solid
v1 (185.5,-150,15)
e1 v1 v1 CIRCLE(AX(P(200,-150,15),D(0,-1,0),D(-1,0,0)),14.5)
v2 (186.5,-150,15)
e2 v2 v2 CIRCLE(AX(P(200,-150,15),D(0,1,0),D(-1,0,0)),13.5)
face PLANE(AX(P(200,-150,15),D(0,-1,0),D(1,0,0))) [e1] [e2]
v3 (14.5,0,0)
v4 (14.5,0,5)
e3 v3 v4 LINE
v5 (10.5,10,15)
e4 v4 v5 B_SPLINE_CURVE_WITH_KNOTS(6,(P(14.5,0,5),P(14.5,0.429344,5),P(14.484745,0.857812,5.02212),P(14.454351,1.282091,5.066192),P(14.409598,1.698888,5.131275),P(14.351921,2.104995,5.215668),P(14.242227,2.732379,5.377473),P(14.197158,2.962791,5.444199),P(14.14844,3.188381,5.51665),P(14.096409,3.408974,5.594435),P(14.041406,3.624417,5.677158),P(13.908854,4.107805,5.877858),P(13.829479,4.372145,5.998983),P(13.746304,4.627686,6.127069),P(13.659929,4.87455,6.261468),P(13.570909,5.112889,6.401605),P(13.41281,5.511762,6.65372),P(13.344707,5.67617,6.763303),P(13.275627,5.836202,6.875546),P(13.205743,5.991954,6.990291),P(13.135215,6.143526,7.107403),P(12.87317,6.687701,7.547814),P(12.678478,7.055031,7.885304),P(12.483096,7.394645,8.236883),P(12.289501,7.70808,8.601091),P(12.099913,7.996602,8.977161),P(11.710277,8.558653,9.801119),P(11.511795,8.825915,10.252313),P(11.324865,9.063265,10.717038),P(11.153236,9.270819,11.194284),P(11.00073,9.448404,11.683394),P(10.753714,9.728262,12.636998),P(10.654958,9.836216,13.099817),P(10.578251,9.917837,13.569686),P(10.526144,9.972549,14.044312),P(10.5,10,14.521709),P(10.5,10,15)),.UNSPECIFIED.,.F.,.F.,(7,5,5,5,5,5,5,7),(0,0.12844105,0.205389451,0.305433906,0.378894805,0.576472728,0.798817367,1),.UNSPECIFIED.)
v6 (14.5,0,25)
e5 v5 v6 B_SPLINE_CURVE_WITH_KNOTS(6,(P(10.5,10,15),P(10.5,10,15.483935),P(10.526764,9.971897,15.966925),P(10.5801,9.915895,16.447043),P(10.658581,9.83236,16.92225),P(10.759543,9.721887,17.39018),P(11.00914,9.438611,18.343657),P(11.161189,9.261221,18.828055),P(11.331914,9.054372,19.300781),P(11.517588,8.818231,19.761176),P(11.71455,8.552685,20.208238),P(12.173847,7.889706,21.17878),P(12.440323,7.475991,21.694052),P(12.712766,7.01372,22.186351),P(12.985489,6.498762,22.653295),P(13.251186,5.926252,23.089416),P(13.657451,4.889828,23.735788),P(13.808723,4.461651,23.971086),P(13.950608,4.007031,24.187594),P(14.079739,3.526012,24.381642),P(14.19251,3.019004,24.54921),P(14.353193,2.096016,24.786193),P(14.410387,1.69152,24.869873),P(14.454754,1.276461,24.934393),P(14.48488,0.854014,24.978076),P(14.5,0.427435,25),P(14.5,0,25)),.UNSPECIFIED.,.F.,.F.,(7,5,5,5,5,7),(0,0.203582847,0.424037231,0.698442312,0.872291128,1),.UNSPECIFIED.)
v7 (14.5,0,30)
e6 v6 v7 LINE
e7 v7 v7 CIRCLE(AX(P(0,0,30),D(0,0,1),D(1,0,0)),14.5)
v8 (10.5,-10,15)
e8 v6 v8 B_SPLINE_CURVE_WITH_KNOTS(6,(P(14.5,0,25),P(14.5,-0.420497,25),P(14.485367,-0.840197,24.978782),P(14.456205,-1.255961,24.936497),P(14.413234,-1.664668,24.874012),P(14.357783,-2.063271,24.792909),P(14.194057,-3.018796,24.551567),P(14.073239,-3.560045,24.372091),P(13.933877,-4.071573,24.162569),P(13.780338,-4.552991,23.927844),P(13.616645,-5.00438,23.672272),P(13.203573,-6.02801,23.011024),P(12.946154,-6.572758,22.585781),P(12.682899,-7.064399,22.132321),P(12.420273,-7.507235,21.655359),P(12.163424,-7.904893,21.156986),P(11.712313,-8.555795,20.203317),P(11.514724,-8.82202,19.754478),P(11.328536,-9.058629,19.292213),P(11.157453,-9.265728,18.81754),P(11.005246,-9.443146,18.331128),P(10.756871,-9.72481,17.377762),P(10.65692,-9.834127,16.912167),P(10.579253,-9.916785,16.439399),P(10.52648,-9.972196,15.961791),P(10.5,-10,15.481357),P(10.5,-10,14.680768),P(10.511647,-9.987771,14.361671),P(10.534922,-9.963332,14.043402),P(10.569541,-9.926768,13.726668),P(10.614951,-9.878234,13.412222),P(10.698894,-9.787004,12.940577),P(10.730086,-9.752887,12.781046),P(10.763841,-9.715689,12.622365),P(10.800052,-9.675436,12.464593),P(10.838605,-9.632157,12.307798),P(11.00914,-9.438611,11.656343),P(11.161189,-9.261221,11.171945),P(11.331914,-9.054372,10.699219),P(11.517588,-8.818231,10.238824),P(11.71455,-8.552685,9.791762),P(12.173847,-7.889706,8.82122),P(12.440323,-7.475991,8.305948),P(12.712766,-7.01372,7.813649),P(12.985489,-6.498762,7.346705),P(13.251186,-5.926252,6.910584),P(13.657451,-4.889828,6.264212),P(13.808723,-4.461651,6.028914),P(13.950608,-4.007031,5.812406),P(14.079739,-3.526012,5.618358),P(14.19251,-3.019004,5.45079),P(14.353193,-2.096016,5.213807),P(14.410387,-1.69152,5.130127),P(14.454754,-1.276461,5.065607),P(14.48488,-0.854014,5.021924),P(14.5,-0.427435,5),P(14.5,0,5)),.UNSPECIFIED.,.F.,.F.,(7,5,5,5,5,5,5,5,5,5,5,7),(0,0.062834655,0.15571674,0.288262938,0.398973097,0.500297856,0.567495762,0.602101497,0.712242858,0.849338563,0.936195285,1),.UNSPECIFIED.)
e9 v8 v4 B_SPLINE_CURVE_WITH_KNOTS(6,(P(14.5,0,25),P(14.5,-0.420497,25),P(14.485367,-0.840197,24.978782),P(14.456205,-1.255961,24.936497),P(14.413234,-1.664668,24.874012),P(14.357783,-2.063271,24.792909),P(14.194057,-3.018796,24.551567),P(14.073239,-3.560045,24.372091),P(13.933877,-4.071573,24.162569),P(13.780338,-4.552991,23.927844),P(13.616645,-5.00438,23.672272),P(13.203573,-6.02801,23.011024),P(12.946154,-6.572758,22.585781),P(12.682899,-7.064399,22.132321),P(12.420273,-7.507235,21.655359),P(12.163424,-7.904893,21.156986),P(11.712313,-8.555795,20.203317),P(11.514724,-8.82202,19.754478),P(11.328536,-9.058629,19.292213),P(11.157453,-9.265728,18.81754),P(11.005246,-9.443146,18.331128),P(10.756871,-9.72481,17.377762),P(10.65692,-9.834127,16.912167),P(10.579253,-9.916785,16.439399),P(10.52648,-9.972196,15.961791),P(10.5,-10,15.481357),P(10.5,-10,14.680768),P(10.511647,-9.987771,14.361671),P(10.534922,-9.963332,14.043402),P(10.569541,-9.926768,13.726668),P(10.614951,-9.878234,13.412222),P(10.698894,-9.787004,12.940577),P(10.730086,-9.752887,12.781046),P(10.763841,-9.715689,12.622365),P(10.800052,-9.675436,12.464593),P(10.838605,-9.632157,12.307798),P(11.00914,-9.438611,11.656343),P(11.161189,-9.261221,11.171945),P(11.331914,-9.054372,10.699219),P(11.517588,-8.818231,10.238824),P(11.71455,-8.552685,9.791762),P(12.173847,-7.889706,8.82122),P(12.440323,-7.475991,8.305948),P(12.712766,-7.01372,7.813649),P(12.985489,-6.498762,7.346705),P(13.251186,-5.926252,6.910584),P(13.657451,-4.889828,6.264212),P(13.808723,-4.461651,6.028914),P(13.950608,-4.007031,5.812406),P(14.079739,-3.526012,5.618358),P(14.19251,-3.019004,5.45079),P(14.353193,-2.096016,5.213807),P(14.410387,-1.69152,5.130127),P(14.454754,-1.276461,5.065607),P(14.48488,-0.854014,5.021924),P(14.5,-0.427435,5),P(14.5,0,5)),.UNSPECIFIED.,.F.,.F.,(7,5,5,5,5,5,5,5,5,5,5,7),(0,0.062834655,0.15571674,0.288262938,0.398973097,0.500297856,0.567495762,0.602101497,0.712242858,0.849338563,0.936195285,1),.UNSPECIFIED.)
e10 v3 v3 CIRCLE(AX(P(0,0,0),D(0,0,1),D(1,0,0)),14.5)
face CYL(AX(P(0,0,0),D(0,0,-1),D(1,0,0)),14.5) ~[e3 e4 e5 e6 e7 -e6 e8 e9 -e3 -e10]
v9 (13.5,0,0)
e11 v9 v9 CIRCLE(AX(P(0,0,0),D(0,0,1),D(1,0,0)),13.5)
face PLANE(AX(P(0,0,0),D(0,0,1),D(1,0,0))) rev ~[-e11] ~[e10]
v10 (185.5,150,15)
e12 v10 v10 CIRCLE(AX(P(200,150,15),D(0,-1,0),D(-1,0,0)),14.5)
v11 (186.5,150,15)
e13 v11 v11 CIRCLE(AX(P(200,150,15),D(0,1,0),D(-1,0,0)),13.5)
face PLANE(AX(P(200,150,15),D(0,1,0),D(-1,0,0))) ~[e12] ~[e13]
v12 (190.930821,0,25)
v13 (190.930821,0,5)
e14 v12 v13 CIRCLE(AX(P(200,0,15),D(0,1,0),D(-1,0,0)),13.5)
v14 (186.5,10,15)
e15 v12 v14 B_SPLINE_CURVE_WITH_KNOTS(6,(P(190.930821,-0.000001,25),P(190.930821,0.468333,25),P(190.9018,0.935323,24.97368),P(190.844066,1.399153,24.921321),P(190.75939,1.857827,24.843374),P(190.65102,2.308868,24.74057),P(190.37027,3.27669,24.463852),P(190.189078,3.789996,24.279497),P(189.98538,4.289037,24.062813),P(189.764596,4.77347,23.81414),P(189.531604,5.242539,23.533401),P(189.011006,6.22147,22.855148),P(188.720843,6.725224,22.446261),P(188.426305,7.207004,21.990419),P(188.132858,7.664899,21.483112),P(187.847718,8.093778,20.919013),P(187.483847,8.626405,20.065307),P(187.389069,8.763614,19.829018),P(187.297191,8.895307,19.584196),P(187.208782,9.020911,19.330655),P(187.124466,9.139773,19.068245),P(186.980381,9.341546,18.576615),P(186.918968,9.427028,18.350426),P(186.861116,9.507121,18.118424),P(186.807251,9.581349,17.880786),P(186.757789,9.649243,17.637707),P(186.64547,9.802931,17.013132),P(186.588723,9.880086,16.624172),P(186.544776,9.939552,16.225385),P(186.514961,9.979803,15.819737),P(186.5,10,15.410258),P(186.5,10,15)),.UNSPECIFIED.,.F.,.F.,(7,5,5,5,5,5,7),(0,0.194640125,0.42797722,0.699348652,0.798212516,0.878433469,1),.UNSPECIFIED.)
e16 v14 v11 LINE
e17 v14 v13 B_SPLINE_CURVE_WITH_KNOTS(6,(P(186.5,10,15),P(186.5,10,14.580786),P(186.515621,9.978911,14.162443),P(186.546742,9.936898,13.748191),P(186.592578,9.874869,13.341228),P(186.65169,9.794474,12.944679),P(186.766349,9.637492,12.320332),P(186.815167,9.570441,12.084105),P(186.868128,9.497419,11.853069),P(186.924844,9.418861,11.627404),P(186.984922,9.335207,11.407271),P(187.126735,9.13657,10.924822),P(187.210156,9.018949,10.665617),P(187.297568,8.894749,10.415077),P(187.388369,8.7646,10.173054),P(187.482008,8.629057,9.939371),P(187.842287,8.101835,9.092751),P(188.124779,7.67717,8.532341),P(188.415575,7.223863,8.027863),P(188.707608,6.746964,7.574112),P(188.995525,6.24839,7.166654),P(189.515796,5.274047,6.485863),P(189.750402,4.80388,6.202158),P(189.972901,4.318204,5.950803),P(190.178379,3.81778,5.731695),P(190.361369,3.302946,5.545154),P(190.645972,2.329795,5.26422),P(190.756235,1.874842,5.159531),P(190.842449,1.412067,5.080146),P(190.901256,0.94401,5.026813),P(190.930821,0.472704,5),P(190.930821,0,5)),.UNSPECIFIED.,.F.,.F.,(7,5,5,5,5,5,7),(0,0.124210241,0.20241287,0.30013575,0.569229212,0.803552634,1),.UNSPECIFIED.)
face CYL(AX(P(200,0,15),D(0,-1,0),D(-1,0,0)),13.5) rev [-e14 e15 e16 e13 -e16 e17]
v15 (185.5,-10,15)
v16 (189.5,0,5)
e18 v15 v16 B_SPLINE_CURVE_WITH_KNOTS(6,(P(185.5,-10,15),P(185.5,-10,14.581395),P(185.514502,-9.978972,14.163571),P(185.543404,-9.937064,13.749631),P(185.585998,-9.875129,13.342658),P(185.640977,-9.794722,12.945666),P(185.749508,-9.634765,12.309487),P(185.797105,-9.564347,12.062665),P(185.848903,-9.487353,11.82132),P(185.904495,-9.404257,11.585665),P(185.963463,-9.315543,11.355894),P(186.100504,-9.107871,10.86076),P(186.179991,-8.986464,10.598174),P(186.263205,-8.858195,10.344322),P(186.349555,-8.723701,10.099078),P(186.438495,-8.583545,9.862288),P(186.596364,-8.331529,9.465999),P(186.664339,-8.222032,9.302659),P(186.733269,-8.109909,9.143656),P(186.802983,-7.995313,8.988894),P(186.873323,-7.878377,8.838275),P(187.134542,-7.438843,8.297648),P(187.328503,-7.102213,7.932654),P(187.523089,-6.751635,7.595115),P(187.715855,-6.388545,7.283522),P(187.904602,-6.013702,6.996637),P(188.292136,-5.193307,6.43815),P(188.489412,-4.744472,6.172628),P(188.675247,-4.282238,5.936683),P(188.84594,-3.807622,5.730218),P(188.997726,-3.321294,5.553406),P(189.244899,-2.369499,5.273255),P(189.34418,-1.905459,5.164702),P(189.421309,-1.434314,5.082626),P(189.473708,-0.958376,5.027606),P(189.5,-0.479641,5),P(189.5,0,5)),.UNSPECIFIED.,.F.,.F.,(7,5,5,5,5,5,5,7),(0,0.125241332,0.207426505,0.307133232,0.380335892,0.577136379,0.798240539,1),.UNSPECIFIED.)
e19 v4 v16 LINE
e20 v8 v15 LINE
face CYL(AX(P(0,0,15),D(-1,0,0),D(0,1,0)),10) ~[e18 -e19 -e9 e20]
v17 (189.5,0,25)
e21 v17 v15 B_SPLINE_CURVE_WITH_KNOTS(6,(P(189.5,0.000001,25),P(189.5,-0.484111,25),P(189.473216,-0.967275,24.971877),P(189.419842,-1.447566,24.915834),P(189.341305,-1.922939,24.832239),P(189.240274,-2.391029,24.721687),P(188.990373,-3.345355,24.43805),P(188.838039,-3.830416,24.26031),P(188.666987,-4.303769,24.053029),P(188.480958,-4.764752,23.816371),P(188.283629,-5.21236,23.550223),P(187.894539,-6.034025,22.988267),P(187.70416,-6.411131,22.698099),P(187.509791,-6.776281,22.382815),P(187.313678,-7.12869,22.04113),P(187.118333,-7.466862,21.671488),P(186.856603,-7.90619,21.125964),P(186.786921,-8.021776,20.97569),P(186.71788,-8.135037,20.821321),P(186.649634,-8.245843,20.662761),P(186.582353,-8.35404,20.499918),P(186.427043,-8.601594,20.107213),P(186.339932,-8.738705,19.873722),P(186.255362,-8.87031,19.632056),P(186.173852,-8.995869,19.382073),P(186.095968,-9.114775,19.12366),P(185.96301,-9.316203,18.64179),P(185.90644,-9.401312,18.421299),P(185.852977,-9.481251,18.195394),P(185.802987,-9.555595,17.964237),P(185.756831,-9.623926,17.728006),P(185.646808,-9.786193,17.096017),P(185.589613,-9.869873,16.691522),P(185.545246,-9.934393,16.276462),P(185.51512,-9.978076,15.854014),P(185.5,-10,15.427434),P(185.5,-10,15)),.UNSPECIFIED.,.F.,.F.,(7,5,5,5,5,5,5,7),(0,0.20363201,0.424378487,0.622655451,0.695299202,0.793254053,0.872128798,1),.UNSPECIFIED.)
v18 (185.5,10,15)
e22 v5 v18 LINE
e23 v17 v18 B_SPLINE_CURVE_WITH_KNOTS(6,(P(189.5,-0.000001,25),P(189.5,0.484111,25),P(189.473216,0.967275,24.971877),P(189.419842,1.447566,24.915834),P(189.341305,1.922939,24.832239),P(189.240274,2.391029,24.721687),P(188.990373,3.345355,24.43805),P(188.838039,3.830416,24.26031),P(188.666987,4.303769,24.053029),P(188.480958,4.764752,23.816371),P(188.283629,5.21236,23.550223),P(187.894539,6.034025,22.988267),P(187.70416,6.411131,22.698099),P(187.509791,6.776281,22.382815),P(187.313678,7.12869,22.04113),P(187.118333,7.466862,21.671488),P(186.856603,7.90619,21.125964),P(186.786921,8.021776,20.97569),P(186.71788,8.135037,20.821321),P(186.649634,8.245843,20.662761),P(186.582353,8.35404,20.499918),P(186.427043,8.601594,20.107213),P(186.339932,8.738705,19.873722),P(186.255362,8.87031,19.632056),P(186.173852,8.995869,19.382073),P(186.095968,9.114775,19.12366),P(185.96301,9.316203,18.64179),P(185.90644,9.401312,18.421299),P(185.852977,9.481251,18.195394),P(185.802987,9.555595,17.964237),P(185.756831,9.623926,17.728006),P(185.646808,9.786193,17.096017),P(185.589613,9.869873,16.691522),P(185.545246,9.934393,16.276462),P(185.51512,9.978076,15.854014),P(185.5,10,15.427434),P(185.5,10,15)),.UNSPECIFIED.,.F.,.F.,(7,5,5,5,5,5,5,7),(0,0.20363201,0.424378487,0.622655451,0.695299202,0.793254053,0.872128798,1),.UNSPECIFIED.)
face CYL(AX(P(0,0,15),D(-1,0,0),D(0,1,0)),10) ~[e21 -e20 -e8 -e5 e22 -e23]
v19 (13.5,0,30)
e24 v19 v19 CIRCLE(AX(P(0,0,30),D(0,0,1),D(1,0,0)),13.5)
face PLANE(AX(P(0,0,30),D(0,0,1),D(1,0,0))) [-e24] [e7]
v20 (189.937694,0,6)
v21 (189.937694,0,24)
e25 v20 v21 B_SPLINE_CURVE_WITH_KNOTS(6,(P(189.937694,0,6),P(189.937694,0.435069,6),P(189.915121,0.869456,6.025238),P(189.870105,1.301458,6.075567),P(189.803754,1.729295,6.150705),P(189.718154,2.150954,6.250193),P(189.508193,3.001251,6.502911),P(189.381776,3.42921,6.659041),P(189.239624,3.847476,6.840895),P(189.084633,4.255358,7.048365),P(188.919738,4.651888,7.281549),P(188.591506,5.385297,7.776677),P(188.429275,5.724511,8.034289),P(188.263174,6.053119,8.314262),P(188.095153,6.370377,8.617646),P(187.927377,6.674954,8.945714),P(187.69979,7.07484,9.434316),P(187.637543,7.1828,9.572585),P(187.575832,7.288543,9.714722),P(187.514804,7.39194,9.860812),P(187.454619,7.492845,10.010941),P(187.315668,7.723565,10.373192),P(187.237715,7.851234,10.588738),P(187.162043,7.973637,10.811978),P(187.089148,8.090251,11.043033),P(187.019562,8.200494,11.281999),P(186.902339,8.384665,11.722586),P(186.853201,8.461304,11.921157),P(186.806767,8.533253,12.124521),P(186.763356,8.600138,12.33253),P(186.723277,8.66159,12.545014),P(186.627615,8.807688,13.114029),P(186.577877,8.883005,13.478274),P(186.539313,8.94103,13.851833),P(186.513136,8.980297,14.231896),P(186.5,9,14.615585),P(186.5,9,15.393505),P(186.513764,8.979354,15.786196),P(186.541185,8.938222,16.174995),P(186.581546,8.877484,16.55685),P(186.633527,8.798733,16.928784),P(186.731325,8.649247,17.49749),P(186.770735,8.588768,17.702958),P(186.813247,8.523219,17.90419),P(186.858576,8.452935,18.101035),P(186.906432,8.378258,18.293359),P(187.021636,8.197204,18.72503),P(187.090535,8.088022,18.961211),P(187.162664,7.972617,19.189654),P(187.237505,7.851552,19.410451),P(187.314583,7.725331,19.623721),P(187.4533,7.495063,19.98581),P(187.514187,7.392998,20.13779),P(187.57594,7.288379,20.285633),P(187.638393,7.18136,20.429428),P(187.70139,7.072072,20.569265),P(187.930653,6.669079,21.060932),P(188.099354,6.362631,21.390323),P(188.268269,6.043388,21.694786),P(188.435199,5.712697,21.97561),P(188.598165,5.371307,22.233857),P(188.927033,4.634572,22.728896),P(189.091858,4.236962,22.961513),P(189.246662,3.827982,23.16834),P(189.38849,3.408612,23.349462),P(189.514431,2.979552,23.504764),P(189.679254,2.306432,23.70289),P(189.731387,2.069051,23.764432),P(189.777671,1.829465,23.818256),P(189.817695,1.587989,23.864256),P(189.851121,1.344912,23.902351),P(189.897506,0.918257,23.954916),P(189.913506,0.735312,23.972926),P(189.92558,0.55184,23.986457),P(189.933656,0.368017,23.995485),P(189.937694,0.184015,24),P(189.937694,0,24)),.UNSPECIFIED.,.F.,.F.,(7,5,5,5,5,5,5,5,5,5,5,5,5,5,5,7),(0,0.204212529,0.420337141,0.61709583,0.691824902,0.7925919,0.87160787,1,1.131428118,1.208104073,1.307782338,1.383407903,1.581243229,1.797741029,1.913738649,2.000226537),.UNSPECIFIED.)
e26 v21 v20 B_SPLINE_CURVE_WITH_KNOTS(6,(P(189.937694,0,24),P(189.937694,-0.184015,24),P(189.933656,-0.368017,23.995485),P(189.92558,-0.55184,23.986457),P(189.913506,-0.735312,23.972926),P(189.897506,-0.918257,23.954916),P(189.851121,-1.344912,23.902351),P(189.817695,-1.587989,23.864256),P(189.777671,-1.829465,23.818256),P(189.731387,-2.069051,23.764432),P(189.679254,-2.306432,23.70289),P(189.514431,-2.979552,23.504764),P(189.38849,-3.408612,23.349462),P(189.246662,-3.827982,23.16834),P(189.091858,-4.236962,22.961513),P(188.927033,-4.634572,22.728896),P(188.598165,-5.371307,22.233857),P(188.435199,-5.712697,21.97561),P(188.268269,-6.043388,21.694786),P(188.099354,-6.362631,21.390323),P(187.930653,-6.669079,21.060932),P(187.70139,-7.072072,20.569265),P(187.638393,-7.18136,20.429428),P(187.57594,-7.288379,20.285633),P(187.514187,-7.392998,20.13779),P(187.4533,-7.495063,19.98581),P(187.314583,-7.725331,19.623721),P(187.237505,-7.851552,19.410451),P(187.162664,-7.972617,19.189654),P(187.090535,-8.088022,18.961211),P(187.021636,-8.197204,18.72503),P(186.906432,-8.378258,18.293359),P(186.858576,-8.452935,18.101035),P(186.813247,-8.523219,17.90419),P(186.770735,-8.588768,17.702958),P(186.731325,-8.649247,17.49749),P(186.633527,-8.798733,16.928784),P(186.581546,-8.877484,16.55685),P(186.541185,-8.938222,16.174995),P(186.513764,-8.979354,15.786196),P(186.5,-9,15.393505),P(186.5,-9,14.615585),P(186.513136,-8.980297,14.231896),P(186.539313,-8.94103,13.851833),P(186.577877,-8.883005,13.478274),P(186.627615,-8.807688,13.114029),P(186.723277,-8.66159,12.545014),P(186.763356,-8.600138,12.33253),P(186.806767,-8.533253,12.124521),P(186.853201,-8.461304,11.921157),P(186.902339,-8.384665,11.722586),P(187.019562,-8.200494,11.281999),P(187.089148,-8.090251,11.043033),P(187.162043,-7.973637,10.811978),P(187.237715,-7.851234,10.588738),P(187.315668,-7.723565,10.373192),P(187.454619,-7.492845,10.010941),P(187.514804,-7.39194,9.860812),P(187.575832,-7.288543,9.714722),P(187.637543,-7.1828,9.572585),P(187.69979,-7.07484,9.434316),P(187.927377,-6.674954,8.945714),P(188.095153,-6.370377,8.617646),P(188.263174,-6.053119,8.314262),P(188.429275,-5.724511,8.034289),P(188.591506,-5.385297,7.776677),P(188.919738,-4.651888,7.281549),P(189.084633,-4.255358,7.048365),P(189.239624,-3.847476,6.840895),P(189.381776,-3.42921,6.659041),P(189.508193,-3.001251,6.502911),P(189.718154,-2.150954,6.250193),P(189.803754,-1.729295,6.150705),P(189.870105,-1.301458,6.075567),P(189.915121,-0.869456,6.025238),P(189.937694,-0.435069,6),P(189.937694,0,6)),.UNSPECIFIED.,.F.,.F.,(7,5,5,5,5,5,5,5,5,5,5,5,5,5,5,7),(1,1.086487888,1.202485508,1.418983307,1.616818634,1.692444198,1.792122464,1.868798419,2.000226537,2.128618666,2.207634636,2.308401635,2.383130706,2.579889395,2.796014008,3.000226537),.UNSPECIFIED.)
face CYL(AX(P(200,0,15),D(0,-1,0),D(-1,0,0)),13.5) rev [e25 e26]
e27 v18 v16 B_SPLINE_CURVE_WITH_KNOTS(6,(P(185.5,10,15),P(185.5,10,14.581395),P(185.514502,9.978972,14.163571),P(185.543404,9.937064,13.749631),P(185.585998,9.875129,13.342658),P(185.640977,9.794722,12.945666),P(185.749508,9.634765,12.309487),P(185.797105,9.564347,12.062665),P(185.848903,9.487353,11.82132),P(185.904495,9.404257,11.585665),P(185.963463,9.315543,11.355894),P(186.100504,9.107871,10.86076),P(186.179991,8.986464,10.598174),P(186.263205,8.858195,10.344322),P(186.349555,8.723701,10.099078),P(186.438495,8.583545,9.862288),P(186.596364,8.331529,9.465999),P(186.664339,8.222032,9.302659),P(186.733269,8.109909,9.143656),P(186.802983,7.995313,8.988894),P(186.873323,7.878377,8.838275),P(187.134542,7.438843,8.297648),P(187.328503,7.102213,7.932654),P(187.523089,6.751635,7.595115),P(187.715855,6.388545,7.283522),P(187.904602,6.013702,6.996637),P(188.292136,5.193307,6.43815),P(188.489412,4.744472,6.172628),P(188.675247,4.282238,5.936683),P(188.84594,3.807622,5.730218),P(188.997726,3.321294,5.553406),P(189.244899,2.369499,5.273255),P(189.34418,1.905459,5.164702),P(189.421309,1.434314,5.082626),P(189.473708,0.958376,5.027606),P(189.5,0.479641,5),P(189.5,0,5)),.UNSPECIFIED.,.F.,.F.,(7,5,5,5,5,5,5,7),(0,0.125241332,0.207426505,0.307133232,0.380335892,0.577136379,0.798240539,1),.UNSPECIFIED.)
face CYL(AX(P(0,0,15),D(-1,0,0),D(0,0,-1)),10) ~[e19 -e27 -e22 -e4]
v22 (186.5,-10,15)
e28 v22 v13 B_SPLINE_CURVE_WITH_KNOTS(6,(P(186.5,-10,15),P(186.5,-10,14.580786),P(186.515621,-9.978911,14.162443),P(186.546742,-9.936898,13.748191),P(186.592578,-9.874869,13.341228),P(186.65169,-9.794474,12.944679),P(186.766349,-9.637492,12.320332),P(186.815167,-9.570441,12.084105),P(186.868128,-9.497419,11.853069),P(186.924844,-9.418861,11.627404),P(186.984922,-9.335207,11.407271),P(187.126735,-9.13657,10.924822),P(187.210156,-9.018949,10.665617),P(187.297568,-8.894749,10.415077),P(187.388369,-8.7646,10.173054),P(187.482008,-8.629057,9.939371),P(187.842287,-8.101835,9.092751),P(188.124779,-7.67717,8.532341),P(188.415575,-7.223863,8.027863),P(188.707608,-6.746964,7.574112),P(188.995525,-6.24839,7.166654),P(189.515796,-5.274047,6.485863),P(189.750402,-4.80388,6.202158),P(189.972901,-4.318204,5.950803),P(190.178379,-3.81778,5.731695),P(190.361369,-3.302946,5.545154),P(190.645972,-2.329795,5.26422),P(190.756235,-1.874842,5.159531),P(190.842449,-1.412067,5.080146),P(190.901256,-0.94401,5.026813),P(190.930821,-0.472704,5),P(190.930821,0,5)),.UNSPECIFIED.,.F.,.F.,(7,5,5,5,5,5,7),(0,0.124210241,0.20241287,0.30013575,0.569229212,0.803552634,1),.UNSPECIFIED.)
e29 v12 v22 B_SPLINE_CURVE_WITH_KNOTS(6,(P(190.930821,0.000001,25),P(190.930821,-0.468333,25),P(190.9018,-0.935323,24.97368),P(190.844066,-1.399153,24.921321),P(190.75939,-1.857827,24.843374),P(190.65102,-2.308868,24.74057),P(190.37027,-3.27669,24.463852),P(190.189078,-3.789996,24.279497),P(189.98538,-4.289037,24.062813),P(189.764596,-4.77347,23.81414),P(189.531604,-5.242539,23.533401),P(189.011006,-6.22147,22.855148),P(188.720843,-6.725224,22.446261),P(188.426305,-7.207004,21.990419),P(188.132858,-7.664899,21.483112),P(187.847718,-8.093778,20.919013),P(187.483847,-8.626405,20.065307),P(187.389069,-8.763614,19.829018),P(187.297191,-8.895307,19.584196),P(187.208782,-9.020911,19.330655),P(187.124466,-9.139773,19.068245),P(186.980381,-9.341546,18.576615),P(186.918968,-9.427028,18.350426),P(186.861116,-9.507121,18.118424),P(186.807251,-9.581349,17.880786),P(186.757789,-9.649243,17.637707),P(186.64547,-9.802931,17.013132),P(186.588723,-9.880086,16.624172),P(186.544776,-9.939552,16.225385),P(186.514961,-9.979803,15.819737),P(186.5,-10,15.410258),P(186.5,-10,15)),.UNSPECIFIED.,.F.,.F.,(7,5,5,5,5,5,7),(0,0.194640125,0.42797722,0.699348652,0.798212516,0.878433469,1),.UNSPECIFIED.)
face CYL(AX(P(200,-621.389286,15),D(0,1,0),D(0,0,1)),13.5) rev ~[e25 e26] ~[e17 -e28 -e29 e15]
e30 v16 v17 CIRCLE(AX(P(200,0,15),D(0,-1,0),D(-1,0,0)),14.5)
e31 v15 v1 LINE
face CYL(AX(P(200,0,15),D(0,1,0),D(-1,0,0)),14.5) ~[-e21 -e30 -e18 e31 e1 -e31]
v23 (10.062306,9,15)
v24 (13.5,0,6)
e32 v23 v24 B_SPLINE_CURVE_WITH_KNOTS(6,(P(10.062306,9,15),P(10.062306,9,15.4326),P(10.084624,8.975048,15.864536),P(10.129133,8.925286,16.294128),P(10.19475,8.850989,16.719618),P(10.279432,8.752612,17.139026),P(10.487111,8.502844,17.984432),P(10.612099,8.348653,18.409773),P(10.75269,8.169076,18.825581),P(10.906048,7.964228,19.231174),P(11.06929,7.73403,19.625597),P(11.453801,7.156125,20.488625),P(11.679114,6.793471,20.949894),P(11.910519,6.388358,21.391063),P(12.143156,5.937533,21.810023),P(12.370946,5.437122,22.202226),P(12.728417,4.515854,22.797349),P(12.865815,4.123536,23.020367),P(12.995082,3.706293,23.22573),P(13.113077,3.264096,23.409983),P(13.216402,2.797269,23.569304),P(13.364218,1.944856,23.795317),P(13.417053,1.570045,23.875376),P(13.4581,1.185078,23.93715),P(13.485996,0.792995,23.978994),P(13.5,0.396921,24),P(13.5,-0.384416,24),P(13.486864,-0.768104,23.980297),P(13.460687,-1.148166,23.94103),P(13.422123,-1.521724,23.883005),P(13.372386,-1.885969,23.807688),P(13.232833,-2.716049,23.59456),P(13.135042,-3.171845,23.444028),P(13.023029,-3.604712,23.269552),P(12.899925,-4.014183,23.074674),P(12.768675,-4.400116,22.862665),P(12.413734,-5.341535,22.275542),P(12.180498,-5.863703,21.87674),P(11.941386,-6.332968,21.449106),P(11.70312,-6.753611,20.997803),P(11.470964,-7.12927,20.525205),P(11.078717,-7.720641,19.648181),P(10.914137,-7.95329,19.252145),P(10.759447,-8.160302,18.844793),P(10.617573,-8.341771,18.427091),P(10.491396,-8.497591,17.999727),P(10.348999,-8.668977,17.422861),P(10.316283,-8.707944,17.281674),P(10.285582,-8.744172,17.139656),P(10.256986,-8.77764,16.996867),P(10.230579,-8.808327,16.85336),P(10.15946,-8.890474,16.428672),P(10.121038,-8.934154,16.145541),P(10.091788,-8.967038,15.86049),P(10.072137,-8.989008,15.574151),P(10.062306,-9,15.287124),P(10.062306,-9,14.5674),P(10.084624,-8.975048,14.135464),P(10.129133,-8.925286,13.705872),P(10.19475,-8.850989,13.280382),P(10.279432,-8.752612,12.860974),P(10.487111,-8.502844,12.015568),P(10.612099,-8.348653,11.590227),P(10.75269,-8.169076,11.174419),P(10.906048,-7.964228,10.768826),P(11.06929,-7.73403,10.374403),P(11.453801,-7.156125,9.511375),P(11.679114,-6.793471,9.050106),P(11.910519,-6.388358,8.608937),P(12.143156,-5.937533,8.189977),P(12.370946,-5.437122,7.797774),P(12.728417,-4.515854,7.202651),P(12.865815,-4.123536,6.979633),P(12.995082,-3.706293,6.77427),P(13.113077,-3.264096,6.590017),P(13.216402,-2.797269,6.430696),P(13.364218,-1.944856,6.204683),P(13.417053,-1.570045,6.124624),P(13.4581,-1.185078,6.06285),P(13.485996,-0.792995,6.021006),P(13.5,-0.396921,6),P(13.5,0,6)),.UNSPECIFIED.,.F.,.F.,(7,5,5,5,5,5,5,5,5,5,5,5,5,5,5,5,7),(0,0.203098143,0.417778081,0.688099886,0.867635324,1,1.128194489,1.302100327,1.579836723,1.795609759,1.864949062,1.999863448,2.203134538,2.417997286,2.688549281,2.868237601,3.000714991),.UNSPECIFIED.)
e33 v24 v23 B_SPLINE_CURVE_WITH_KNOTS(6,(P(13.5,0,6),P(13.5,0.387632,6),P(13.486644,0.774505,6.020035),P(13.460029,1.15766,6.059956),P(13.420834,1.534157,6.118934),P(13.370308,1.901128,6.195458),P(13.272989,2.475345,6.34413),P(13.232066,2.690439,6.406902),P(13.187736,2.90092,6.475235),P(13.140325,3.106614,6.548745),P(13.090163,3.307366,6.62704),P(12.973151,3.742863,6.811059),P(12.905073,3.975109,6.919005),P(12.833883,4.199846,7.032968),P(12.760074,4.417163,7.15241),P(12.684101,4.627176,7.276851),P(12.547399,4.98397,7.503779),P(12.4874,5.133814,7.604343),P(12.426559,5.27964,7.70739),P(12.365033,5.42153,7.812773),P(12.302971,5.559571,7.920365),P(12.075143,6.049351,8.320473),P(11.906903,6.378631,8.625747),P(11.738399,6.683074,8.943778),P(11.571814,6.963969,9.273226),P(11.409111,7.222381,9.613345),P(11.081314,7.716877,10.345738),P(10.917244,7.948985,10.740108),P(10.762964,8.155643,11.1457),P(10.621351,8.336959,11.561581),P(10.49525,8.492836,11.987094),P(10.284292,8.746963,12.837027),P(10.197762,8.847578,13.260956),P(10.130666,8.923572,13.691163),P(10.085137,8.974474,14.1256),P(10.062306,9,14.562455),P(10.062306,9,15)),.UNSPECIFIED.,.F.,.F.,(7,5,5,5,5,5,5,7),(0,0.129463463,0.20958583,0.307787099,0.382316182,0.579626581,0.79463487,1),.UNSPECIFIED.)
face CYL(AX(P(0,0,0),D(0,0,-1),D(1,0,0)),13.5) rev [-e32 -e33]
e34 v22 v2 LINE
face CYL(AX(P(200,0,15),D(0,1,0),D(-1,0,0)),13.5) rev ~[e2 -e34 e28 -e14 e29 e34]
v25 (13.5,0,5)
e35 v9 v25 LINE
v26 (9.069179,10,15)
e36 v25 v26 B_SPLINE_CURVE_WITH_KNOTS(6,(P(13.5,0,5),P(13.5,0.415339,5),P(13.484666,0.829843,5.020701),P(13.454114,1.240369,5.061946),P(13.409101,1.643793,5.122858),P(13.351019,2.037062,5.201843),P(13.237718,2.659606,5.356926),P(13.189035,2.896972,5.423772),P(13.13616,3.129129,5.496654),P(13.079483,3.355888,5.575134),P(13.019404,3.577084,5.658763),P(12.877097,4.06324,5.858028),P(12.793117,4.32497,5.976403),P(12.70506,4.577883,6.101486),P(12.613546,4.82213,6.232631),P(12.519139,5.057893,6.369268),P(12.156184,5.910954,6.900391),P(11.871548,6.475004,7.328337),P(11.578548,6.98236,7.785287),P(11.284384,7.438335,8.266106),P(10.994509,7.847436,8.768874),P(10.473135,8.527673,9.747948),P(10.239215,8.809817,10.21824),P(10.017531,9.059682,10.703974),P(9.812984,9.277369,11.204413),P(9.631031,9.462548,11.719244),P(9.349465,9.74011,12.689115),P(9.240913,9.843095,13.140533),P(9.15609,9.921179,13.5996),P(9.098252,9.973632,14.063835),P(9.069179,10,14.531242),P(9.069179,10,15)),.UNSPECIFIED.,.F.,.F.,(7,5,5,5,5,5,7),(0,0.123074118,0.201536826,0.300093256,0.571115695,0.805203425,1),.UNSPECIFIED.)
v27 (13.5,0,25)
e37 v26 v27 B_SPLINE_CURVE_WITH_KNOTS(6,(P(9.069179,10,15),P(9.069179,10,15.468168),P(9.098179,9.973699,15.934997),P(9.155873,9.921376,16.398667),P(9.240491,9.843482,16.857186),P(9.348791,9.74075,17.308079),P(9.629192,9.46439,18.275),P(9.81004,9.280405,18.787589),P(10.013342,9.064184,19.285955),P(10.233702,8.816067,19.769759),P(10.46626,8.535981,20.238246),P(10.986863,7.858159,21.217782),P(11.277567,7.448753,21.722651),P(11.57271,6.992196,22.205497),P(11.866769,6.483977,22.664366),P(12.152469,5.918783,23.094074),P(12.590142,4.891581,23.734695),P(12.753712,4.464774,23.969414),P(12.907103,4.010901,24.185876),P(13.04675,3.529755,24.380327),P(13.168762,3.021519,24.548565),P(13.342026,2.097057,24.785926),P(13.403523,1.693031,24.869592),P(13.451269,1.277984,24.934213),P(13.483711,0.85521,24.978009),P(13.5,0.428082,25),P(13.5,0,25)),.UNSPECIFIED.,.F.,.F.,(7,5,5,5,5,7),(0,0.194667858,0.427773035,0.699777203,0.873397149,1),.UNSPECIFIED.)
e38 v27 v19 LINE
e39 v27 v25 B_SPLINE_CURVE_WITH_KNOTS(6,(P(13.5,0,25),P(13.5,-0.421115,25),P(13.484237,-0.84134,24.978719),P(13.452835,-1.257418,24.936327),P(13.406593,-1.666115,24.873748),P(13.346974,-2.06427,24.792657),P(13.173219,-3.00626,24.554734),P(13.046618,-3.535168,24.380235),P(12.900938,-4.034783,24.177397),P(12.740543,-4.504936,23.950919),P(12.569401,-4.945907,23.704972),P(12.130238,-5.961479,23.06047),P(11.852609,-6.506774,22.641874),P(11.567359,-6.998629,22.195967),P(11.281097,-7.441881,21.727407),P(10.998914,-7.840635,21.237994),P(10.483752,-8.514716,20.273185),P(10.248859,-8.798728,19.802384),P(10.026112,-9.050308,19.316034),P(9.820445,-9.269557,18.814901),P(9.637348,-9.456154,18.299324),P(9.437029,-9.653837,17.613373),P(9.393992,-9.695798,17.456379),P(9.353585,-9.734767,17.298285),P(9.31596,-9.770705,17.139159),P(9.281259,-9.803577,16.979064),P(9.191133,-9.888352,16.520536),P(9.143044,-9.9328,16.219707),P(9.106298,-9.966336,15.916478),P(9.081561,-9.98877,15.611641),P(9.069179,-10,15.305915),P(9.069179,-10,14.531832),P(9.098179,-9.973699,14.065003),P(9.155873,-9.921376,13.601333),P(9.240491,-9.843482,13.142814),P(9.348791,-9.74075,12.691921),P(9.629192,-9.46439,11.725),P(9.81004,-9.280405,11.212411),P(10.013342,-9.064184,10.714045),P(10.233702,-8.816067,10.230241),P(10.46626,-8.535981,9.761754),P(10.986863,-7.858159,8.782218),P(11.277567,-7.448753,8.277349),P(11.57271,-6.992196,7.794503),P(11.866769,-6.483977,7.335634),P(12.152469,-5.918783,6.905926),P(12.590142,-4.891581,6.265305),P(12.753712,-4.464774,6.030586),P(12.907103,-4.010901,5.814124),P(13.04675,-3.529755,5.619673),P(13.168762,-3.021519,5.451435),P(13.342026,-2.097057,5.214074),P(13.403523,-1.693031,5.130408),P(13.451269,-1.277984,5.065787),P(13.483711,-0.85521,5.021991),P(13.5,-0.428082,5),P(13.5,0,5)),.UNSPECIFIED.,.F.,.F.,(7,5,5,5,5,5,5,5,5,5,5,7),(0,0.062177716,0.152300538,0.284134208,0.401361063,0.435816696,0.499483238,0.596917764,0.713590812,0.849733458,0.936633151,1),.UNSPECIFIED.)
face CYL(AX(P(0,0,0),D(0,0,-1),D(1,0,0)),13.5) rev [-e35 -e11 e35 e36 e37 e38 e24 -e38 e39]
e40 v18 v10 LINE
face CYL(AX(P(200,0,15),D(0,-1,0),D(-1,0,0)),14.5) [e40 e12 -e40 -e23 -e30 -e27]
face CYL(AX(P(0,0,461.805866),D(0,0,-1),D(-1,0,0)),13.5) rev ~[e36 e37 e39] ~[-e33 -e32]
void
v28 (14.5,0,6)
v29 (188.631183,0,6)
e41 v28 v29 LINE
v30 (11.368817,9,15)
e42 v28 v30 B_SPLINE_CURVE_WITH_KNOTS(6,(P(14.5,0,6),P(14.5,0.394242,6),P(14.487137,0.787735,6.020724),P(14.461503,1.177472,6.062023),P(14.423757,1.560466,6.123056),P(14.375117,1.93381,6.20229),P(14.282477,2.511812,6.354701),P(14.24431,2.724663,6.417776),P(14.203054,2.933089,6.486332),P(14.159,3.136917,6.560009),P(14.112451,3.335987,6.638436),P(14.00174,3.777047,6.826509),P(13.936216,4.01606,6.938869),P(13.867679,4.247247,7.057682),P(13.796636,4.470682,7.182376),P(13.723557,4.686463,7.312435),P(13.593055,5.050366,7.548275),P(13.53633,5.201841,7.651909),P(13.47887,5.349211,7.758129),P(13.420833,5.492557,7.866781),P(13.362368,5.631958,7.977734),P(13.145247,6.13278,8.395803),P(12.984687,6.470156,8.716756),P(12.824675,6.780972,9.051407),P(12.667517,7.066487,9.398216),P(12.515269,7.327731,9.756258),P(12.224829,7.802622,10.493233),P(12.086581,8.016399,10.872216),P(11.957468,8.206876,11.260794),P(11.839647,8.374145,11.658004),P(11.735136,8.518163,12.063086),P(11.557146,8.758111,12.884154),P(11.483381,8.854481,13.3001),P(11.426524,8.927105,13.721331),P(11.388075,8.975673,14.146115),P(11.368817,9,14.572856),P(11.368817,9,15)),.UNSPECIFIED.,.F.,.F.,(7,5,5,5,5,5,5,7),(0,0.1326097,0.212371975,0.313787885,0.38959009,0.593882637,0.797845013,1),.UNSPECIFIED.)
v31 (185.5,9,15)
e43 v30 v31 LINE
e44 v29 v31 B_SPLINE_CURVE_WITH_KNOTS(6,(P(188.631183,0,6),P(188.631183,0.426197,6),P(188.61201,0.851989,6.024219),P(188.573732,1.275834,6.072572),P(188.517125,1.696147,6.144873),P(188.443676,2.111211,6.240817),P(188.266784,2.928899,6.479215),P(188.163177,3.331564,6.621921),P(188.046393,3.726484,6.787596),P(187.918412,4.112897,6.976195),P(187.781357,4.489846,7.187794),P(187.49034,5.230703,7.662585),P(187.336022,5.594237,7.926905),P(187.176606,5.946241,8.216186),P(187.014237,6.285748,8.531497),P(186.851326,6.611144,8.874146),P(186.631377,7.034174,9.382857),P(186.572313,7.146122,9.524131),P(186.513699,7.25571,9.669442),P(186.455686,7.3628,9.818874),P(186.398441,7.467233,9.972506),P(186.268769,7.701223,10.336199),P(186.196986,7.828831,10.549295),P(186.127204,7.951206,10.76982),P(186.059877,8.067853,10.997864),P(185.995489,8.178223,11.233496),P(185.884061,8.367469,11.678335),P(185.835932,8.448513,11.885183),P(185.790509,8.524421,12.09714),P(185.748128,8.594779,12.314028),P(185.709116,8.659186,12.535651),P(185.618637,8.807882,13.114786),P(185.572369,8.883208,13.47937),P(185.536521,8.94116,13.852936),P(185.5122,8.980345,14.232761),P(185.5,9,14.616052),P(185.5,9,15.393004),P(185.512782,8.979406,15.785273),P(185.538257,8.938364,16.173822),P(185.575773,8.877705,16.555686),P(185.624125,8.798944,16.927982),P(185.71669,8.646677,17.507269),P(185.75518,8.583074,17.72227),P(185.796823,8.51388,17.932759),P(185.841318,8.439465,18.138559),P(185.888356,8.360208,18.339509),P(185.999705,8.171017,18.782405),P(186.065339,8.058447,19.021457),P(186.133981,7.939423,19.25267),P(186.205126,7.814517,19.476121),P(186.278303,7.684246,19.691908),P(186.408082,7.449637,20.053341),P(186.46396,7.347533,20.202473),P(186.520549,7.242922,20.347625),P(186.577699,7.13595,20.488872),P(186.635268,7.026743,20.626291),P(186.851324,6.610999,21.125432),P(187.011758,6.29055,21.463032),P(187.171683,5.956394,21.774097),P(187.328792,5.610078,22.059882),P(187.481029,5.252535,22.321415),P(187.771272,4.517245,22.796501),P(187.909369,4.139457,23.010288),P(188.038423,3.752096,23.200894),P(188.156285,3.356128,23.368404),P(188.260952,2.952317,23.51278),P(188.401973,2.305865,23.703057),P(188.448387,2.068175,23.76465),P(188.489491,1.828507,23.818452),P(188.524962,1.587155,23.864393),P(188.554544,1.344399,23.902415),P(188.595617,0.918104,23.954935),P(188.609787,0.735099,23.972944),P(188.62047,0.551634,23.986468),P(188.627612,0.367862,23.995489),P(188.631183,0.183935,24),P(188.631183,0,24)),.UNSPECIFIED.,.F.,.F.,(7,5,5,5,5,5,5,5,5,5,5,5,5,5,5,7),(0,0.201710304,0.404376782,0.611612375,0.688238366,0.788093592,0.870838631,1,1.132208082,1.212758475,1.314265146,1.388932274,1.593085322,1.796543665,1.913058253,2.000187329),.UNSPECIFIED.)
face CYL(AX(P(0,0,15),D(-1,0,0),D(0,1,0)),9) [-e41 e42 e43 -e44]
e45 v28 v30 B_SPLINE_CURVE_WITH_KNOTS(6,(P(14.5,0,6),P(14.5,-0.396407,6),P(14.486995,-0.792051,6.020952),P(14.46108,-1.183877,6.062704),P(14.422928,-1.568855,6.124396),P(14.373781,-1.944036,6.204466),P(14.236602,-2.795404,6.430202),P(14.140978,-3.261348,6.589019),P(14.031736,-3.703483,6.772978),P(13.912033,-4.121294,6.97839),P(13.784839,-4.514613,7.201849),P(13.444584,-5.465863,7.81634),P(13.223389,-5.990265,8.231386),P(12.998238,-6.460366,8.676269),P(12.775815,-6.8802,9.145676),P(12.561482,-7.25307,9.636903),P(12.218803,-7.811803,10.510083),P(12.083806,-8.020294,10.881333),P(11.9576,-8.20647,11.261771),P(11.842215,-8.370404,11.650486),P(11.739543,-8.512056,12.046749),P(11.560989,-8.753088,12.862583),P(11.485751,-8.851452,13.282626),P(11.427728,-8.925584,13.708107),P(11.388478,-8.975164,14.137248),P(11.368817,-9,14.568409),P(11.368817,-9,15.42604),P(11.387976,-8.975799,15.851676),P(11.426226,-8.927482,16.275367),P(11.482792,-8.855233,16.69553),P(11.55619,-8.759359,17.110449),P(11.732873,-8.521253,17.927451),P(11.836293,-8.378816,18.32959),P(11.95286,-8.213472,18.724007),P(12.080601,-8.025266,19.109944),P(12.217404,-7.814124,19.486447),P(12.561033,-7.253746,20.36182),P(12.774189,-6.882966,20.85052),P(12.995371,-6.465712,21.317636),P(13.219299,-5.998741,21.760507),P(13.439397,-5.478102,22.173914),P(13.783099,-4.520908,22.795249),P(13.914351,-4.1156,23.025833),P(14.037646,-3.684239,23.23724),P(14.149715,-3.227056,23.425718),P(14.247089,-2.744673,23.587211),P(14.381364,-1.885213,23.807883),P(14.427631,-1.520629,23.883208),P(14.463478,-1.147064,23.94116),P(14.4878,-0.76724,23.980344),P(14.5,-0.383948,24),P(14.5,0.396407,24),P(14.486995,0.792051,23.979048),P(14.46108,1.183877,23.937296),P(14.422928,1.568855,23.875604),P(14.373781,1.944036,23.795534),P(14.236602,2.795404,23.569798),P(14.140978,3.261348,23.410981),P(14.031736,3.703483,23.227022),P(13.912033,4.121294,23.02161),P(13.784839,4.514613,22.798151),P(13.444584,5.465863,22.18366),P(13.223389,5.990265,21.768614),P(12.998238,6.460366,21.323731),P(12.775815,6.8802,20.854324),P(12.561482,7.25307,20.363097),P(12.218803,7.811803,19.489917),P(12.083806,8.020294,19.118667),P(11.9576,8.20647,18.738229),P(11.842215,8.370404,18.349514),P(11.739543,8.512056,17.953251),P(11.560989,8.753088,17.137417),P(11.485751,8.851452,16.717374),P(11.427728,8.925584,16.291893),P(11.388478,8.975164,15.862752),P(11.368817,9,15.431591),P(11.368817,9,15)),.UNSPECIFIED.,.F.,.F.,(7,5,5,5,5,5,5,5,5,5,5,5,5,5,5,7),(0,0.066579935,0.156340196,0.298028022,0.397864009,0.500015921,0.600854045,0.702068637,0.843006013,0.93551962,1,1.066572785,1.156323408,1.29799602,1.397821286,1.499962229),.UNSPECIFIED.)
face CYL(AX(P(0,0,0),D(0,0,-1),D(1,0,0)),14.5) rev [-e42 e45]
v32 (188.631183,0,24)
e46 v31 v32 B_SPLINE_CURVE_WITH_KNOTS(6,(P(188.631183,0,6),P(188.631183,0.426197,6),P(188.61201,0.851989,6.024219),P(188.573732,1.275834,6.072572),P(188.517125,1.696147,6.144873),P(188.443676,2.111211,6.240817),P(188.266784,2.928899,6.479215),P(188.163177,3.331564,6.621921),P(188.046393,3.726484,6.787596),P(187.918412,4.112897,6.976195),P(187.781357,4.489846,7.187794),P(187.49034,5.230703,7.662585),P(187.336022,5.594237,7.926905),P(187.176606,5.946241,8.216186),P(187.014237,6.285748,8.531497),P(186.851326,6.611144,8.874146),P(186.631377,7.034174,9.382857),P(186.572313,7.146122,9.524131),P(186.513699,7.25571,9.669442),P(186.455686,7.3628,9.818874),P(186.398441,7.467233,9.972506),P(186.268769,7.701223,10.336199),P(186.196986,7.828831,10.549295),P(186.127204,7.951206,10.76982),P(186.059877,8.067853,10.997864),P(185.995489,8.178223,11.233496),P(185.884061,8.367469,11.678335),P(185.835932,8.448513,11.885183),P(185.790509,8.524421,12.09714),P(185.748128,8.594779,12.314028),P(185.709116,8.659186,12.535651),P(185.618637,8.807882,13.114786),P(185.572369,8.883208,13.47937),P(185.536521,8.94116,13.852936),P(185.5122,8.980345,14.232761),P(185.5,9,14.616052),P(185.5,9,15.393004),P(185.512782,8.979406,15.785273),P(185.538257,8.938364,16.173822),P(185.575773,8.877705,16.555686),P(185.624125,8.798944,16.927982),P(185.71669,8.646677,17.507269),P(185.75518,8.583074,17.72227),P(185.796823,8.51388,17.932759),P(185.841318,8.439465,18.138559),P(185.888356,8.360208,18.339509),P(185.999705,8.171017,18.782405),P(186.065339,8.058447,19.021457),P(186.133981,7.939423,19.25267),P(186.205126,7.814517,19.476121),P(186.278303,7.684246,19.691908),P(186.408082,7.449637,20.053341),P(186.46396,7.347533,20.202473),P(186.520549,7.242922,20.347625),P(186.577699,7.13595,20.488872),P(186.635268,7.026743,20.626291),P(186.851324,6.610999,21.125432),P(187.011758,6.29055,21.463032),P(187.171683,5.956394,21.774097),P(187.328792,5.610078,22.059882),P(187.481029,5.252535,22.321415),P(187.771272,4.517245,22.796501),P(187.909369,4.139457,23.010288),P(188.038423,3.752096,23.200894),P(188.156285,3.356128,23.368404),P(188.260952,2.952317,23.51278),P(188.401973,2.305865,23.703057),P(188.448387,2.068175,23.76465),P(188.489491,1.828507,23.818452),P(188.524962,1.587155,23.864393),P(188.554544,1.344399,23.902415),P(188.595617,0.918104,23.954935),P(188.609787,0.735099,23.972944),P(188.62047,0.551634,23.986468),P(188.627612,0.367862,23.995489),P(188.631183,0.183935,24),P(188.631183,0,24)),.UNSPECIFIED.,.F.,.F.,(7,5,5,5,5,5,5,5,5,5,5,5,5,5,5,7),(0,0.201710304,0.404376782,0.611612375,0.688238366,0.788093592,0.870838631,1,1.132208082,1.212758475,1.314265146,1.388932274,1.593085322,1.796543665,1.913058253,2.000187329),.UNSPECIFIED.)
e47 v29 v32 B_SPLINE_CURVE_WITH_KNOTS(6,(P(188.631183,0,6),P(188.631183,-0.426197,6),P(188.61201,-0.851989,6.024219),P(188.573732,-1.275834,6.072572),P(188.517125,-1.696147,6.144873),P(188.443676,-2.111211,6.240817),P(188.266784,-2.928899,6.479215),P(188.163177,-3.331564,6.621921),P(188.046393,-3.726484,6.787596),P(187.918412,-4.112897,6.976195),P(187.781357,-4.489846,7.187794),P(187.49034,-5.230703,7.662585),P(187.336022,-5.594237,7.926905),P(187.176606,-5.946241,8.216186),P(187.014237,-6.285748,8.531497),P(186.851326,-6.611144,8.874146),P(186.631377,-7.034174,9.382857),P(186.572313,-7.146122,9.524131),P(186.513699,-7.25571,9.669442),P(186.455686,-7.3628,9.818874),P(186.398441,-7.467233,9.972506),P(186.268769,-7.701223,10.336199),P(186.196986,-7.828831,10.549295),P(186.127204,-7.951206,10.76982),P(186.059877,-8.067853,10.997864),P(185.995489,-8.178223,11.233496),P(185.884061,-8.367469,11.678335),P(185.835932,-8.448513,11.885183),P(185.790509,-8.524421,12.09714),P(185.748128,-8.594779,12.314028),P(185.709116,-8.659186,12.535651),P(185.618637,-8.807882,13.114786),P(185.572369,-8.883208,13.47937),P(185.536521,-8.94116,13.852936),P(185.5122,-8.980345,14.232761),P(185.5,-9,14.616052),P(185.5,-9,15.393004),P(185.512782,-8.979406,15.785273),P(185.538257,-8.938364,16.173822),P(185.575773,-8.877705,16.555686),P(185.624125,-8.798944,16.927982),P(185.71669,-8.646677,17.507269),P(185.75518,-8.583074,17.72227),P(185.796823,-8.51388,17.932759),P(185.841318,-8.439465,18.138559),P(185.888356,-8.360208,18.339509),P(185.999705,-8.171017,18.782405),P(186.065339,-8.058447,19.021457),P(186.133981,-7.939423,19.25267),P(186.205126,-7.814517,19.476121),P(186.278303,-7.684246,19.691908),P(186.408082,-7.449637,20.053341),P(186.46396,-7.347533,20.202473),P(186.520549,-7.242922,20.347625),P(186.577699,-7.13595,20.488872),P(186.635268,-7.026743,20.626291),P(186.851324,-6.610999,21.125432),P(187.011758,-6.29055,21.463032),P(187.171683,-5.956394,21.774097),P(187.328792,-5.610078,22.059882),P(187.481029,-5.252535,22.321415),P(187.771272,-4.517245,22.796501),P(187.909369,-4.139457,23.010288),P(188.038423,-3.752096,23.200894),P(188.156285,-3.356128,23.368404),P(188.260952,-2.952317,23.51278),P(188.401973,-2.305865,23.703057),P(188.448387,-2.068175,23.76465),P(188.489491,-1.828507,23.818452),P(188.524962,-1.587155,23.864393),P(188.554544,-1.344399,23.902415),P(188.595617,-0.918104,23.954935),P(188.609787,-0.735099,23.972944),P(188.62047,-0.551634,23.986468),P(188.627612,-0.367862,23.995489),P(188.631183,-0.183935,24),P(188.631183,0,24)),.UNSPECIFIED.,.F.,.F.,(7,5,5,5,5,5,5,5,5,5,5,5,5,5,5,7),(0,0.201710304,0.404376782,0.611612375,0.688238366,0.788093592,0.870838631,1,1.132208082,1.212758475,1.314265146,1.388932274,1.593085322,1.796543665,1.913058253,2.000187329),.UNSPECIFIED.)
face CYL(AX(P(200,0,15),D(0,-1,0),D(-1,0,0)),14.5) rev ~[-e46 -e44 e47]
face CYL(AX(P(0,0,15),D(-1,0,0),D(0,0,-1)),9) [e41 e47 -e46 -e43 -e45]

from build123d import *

# Parameters (mm, degrees)
F0_R          = 14.5
F0_R_2        = 13.5
F1_DEPTH      = 30
F3_DEPTH      = 200
F4_END_RADIUS = 13.5
F3_FACE_R     = 10
F3_FACE_R_2   = 9
F4_REACH      = 228.2852713475
F6_DEPTH      = 150
F8_END_RADIUS = 13.5
F3_FACE1_R    = 10
F3_FACE1_R_2  = 9
F8_REACH      = 242.7852713475


with BuildPart() as f1:
    # F0 (on Top) → F1 (new body)
    with BuildSketch(Plane.XY):
        Circle(F0_R)
        Circle(F0_R_2, mode=Mode.SUBTRACT)
    extrude(amount=F1_DEPTH)

    # F2 (on Right) → F3 (join)
    with BuildSketch(Plane.YZ):
        with BuildLine():
            ThreePointArc((10, 15), (-7.0710678119, 22.0710678119), (0, 5))
            ThreePointArc((0, 5), (7.0710678119, 7.9289321881), (10, 15))
        make_face()
        with BuildLine():
            ThreePointArc((9, 15), (6.3639610307, 8.6360389693), (0, 6))
            ThreePointArc((0, 6), (-6.3639610307, 21.3639610307), (9, 15))
        make_face(mode=Mode.SUBTRACT)
    extrude(amount=F3_DEPTH)

    f4_end = (Plane(origin=(0, 0, 15), x_dir=(-1, 0, 0), z_dir=(0, 0, -1)) * Cylinder(F4_END_RADIUS, 893.6117311859, mode=Mode.PRIVATE)).faces().sort_by_distance((-13.5, 0, 15))[0]
    # F3_face (on face) → F4 (cut, up to the whole of a round face its end follows)
    with BuildSketch(Plane(origin=(0, 0, 15), x_dir=(0, 1, 0), z_dir=(-1, 0, 0))):
        Circle(F3_FACE_R)
        Circle(F3_FACE_R_2, mode=Mode.SUBTRACT)
    f4_long = extrude(amount=-F4_REACH, mode=Mode.PRIVATE)
    add(split(f4_long, bisect_by=f4_end, keep=Keep.BOTTOM, mode=Mode.PRIVATE), mode=Mode.SUBTRACT)

    # F5 (on Front) → F6 (join)
    with BuildSketch(Plane.XZ):
        with BuildLine():
            ThreePointArc((214.5, 15), (200, 29.5), (185.5, 15))
            ThreePointArc((185.5, 15), (200, 0.5), (214.5, 15))
        make_face()
        with BuildLine():
            ThreePointArc((213.5, 15), (200, 1.5), (186.5, 15))
            ThreePointArc((186.5, 15), (200, 28.5), (213.5, 15))
        make_face(mode=Mode.SUBTRACT)
    extrude(amount=F6_DEPTH)

    # F7: F1 across plane


with BuildPart() as f1_1:
    add(f1.part)
    add(f1.part.mirror(Plane.XZ))

    f8_end = (Plane(origin=(200, 0, 15), x_dir=(0, 0, 1), z_dir=(0, 1, 0)) * Cylinder(F8_END_RADIUS, 1242.7785728256, mode=Mode.PRIVATE)).faces().sort_by_distance((186.5, -146.9757976235, 15))[0]
    # F3_face1 (on face) → F8 (cut, up to the whole of a round face its end follows)
    with BuildSketch(Plane(origin=(200, 0, 15), x_dir=(0, 1, 0), z_dir=(1, 0, 0))):
        Circle(F3_FACE1_R)
        Circle(F3_FACE1_R_2, mode=Mode.SUBTRACT)
    f8_long = extrude(amount=-F8_REACH, mode=Mode.PRIVATE)
    add(split(f8_long, bisect_by=f8_end, keep=Keep.BOTTOM, mode=Mode.PRIVATE), mode=Mode.SUBTRACT)


solid = f1_1.part
